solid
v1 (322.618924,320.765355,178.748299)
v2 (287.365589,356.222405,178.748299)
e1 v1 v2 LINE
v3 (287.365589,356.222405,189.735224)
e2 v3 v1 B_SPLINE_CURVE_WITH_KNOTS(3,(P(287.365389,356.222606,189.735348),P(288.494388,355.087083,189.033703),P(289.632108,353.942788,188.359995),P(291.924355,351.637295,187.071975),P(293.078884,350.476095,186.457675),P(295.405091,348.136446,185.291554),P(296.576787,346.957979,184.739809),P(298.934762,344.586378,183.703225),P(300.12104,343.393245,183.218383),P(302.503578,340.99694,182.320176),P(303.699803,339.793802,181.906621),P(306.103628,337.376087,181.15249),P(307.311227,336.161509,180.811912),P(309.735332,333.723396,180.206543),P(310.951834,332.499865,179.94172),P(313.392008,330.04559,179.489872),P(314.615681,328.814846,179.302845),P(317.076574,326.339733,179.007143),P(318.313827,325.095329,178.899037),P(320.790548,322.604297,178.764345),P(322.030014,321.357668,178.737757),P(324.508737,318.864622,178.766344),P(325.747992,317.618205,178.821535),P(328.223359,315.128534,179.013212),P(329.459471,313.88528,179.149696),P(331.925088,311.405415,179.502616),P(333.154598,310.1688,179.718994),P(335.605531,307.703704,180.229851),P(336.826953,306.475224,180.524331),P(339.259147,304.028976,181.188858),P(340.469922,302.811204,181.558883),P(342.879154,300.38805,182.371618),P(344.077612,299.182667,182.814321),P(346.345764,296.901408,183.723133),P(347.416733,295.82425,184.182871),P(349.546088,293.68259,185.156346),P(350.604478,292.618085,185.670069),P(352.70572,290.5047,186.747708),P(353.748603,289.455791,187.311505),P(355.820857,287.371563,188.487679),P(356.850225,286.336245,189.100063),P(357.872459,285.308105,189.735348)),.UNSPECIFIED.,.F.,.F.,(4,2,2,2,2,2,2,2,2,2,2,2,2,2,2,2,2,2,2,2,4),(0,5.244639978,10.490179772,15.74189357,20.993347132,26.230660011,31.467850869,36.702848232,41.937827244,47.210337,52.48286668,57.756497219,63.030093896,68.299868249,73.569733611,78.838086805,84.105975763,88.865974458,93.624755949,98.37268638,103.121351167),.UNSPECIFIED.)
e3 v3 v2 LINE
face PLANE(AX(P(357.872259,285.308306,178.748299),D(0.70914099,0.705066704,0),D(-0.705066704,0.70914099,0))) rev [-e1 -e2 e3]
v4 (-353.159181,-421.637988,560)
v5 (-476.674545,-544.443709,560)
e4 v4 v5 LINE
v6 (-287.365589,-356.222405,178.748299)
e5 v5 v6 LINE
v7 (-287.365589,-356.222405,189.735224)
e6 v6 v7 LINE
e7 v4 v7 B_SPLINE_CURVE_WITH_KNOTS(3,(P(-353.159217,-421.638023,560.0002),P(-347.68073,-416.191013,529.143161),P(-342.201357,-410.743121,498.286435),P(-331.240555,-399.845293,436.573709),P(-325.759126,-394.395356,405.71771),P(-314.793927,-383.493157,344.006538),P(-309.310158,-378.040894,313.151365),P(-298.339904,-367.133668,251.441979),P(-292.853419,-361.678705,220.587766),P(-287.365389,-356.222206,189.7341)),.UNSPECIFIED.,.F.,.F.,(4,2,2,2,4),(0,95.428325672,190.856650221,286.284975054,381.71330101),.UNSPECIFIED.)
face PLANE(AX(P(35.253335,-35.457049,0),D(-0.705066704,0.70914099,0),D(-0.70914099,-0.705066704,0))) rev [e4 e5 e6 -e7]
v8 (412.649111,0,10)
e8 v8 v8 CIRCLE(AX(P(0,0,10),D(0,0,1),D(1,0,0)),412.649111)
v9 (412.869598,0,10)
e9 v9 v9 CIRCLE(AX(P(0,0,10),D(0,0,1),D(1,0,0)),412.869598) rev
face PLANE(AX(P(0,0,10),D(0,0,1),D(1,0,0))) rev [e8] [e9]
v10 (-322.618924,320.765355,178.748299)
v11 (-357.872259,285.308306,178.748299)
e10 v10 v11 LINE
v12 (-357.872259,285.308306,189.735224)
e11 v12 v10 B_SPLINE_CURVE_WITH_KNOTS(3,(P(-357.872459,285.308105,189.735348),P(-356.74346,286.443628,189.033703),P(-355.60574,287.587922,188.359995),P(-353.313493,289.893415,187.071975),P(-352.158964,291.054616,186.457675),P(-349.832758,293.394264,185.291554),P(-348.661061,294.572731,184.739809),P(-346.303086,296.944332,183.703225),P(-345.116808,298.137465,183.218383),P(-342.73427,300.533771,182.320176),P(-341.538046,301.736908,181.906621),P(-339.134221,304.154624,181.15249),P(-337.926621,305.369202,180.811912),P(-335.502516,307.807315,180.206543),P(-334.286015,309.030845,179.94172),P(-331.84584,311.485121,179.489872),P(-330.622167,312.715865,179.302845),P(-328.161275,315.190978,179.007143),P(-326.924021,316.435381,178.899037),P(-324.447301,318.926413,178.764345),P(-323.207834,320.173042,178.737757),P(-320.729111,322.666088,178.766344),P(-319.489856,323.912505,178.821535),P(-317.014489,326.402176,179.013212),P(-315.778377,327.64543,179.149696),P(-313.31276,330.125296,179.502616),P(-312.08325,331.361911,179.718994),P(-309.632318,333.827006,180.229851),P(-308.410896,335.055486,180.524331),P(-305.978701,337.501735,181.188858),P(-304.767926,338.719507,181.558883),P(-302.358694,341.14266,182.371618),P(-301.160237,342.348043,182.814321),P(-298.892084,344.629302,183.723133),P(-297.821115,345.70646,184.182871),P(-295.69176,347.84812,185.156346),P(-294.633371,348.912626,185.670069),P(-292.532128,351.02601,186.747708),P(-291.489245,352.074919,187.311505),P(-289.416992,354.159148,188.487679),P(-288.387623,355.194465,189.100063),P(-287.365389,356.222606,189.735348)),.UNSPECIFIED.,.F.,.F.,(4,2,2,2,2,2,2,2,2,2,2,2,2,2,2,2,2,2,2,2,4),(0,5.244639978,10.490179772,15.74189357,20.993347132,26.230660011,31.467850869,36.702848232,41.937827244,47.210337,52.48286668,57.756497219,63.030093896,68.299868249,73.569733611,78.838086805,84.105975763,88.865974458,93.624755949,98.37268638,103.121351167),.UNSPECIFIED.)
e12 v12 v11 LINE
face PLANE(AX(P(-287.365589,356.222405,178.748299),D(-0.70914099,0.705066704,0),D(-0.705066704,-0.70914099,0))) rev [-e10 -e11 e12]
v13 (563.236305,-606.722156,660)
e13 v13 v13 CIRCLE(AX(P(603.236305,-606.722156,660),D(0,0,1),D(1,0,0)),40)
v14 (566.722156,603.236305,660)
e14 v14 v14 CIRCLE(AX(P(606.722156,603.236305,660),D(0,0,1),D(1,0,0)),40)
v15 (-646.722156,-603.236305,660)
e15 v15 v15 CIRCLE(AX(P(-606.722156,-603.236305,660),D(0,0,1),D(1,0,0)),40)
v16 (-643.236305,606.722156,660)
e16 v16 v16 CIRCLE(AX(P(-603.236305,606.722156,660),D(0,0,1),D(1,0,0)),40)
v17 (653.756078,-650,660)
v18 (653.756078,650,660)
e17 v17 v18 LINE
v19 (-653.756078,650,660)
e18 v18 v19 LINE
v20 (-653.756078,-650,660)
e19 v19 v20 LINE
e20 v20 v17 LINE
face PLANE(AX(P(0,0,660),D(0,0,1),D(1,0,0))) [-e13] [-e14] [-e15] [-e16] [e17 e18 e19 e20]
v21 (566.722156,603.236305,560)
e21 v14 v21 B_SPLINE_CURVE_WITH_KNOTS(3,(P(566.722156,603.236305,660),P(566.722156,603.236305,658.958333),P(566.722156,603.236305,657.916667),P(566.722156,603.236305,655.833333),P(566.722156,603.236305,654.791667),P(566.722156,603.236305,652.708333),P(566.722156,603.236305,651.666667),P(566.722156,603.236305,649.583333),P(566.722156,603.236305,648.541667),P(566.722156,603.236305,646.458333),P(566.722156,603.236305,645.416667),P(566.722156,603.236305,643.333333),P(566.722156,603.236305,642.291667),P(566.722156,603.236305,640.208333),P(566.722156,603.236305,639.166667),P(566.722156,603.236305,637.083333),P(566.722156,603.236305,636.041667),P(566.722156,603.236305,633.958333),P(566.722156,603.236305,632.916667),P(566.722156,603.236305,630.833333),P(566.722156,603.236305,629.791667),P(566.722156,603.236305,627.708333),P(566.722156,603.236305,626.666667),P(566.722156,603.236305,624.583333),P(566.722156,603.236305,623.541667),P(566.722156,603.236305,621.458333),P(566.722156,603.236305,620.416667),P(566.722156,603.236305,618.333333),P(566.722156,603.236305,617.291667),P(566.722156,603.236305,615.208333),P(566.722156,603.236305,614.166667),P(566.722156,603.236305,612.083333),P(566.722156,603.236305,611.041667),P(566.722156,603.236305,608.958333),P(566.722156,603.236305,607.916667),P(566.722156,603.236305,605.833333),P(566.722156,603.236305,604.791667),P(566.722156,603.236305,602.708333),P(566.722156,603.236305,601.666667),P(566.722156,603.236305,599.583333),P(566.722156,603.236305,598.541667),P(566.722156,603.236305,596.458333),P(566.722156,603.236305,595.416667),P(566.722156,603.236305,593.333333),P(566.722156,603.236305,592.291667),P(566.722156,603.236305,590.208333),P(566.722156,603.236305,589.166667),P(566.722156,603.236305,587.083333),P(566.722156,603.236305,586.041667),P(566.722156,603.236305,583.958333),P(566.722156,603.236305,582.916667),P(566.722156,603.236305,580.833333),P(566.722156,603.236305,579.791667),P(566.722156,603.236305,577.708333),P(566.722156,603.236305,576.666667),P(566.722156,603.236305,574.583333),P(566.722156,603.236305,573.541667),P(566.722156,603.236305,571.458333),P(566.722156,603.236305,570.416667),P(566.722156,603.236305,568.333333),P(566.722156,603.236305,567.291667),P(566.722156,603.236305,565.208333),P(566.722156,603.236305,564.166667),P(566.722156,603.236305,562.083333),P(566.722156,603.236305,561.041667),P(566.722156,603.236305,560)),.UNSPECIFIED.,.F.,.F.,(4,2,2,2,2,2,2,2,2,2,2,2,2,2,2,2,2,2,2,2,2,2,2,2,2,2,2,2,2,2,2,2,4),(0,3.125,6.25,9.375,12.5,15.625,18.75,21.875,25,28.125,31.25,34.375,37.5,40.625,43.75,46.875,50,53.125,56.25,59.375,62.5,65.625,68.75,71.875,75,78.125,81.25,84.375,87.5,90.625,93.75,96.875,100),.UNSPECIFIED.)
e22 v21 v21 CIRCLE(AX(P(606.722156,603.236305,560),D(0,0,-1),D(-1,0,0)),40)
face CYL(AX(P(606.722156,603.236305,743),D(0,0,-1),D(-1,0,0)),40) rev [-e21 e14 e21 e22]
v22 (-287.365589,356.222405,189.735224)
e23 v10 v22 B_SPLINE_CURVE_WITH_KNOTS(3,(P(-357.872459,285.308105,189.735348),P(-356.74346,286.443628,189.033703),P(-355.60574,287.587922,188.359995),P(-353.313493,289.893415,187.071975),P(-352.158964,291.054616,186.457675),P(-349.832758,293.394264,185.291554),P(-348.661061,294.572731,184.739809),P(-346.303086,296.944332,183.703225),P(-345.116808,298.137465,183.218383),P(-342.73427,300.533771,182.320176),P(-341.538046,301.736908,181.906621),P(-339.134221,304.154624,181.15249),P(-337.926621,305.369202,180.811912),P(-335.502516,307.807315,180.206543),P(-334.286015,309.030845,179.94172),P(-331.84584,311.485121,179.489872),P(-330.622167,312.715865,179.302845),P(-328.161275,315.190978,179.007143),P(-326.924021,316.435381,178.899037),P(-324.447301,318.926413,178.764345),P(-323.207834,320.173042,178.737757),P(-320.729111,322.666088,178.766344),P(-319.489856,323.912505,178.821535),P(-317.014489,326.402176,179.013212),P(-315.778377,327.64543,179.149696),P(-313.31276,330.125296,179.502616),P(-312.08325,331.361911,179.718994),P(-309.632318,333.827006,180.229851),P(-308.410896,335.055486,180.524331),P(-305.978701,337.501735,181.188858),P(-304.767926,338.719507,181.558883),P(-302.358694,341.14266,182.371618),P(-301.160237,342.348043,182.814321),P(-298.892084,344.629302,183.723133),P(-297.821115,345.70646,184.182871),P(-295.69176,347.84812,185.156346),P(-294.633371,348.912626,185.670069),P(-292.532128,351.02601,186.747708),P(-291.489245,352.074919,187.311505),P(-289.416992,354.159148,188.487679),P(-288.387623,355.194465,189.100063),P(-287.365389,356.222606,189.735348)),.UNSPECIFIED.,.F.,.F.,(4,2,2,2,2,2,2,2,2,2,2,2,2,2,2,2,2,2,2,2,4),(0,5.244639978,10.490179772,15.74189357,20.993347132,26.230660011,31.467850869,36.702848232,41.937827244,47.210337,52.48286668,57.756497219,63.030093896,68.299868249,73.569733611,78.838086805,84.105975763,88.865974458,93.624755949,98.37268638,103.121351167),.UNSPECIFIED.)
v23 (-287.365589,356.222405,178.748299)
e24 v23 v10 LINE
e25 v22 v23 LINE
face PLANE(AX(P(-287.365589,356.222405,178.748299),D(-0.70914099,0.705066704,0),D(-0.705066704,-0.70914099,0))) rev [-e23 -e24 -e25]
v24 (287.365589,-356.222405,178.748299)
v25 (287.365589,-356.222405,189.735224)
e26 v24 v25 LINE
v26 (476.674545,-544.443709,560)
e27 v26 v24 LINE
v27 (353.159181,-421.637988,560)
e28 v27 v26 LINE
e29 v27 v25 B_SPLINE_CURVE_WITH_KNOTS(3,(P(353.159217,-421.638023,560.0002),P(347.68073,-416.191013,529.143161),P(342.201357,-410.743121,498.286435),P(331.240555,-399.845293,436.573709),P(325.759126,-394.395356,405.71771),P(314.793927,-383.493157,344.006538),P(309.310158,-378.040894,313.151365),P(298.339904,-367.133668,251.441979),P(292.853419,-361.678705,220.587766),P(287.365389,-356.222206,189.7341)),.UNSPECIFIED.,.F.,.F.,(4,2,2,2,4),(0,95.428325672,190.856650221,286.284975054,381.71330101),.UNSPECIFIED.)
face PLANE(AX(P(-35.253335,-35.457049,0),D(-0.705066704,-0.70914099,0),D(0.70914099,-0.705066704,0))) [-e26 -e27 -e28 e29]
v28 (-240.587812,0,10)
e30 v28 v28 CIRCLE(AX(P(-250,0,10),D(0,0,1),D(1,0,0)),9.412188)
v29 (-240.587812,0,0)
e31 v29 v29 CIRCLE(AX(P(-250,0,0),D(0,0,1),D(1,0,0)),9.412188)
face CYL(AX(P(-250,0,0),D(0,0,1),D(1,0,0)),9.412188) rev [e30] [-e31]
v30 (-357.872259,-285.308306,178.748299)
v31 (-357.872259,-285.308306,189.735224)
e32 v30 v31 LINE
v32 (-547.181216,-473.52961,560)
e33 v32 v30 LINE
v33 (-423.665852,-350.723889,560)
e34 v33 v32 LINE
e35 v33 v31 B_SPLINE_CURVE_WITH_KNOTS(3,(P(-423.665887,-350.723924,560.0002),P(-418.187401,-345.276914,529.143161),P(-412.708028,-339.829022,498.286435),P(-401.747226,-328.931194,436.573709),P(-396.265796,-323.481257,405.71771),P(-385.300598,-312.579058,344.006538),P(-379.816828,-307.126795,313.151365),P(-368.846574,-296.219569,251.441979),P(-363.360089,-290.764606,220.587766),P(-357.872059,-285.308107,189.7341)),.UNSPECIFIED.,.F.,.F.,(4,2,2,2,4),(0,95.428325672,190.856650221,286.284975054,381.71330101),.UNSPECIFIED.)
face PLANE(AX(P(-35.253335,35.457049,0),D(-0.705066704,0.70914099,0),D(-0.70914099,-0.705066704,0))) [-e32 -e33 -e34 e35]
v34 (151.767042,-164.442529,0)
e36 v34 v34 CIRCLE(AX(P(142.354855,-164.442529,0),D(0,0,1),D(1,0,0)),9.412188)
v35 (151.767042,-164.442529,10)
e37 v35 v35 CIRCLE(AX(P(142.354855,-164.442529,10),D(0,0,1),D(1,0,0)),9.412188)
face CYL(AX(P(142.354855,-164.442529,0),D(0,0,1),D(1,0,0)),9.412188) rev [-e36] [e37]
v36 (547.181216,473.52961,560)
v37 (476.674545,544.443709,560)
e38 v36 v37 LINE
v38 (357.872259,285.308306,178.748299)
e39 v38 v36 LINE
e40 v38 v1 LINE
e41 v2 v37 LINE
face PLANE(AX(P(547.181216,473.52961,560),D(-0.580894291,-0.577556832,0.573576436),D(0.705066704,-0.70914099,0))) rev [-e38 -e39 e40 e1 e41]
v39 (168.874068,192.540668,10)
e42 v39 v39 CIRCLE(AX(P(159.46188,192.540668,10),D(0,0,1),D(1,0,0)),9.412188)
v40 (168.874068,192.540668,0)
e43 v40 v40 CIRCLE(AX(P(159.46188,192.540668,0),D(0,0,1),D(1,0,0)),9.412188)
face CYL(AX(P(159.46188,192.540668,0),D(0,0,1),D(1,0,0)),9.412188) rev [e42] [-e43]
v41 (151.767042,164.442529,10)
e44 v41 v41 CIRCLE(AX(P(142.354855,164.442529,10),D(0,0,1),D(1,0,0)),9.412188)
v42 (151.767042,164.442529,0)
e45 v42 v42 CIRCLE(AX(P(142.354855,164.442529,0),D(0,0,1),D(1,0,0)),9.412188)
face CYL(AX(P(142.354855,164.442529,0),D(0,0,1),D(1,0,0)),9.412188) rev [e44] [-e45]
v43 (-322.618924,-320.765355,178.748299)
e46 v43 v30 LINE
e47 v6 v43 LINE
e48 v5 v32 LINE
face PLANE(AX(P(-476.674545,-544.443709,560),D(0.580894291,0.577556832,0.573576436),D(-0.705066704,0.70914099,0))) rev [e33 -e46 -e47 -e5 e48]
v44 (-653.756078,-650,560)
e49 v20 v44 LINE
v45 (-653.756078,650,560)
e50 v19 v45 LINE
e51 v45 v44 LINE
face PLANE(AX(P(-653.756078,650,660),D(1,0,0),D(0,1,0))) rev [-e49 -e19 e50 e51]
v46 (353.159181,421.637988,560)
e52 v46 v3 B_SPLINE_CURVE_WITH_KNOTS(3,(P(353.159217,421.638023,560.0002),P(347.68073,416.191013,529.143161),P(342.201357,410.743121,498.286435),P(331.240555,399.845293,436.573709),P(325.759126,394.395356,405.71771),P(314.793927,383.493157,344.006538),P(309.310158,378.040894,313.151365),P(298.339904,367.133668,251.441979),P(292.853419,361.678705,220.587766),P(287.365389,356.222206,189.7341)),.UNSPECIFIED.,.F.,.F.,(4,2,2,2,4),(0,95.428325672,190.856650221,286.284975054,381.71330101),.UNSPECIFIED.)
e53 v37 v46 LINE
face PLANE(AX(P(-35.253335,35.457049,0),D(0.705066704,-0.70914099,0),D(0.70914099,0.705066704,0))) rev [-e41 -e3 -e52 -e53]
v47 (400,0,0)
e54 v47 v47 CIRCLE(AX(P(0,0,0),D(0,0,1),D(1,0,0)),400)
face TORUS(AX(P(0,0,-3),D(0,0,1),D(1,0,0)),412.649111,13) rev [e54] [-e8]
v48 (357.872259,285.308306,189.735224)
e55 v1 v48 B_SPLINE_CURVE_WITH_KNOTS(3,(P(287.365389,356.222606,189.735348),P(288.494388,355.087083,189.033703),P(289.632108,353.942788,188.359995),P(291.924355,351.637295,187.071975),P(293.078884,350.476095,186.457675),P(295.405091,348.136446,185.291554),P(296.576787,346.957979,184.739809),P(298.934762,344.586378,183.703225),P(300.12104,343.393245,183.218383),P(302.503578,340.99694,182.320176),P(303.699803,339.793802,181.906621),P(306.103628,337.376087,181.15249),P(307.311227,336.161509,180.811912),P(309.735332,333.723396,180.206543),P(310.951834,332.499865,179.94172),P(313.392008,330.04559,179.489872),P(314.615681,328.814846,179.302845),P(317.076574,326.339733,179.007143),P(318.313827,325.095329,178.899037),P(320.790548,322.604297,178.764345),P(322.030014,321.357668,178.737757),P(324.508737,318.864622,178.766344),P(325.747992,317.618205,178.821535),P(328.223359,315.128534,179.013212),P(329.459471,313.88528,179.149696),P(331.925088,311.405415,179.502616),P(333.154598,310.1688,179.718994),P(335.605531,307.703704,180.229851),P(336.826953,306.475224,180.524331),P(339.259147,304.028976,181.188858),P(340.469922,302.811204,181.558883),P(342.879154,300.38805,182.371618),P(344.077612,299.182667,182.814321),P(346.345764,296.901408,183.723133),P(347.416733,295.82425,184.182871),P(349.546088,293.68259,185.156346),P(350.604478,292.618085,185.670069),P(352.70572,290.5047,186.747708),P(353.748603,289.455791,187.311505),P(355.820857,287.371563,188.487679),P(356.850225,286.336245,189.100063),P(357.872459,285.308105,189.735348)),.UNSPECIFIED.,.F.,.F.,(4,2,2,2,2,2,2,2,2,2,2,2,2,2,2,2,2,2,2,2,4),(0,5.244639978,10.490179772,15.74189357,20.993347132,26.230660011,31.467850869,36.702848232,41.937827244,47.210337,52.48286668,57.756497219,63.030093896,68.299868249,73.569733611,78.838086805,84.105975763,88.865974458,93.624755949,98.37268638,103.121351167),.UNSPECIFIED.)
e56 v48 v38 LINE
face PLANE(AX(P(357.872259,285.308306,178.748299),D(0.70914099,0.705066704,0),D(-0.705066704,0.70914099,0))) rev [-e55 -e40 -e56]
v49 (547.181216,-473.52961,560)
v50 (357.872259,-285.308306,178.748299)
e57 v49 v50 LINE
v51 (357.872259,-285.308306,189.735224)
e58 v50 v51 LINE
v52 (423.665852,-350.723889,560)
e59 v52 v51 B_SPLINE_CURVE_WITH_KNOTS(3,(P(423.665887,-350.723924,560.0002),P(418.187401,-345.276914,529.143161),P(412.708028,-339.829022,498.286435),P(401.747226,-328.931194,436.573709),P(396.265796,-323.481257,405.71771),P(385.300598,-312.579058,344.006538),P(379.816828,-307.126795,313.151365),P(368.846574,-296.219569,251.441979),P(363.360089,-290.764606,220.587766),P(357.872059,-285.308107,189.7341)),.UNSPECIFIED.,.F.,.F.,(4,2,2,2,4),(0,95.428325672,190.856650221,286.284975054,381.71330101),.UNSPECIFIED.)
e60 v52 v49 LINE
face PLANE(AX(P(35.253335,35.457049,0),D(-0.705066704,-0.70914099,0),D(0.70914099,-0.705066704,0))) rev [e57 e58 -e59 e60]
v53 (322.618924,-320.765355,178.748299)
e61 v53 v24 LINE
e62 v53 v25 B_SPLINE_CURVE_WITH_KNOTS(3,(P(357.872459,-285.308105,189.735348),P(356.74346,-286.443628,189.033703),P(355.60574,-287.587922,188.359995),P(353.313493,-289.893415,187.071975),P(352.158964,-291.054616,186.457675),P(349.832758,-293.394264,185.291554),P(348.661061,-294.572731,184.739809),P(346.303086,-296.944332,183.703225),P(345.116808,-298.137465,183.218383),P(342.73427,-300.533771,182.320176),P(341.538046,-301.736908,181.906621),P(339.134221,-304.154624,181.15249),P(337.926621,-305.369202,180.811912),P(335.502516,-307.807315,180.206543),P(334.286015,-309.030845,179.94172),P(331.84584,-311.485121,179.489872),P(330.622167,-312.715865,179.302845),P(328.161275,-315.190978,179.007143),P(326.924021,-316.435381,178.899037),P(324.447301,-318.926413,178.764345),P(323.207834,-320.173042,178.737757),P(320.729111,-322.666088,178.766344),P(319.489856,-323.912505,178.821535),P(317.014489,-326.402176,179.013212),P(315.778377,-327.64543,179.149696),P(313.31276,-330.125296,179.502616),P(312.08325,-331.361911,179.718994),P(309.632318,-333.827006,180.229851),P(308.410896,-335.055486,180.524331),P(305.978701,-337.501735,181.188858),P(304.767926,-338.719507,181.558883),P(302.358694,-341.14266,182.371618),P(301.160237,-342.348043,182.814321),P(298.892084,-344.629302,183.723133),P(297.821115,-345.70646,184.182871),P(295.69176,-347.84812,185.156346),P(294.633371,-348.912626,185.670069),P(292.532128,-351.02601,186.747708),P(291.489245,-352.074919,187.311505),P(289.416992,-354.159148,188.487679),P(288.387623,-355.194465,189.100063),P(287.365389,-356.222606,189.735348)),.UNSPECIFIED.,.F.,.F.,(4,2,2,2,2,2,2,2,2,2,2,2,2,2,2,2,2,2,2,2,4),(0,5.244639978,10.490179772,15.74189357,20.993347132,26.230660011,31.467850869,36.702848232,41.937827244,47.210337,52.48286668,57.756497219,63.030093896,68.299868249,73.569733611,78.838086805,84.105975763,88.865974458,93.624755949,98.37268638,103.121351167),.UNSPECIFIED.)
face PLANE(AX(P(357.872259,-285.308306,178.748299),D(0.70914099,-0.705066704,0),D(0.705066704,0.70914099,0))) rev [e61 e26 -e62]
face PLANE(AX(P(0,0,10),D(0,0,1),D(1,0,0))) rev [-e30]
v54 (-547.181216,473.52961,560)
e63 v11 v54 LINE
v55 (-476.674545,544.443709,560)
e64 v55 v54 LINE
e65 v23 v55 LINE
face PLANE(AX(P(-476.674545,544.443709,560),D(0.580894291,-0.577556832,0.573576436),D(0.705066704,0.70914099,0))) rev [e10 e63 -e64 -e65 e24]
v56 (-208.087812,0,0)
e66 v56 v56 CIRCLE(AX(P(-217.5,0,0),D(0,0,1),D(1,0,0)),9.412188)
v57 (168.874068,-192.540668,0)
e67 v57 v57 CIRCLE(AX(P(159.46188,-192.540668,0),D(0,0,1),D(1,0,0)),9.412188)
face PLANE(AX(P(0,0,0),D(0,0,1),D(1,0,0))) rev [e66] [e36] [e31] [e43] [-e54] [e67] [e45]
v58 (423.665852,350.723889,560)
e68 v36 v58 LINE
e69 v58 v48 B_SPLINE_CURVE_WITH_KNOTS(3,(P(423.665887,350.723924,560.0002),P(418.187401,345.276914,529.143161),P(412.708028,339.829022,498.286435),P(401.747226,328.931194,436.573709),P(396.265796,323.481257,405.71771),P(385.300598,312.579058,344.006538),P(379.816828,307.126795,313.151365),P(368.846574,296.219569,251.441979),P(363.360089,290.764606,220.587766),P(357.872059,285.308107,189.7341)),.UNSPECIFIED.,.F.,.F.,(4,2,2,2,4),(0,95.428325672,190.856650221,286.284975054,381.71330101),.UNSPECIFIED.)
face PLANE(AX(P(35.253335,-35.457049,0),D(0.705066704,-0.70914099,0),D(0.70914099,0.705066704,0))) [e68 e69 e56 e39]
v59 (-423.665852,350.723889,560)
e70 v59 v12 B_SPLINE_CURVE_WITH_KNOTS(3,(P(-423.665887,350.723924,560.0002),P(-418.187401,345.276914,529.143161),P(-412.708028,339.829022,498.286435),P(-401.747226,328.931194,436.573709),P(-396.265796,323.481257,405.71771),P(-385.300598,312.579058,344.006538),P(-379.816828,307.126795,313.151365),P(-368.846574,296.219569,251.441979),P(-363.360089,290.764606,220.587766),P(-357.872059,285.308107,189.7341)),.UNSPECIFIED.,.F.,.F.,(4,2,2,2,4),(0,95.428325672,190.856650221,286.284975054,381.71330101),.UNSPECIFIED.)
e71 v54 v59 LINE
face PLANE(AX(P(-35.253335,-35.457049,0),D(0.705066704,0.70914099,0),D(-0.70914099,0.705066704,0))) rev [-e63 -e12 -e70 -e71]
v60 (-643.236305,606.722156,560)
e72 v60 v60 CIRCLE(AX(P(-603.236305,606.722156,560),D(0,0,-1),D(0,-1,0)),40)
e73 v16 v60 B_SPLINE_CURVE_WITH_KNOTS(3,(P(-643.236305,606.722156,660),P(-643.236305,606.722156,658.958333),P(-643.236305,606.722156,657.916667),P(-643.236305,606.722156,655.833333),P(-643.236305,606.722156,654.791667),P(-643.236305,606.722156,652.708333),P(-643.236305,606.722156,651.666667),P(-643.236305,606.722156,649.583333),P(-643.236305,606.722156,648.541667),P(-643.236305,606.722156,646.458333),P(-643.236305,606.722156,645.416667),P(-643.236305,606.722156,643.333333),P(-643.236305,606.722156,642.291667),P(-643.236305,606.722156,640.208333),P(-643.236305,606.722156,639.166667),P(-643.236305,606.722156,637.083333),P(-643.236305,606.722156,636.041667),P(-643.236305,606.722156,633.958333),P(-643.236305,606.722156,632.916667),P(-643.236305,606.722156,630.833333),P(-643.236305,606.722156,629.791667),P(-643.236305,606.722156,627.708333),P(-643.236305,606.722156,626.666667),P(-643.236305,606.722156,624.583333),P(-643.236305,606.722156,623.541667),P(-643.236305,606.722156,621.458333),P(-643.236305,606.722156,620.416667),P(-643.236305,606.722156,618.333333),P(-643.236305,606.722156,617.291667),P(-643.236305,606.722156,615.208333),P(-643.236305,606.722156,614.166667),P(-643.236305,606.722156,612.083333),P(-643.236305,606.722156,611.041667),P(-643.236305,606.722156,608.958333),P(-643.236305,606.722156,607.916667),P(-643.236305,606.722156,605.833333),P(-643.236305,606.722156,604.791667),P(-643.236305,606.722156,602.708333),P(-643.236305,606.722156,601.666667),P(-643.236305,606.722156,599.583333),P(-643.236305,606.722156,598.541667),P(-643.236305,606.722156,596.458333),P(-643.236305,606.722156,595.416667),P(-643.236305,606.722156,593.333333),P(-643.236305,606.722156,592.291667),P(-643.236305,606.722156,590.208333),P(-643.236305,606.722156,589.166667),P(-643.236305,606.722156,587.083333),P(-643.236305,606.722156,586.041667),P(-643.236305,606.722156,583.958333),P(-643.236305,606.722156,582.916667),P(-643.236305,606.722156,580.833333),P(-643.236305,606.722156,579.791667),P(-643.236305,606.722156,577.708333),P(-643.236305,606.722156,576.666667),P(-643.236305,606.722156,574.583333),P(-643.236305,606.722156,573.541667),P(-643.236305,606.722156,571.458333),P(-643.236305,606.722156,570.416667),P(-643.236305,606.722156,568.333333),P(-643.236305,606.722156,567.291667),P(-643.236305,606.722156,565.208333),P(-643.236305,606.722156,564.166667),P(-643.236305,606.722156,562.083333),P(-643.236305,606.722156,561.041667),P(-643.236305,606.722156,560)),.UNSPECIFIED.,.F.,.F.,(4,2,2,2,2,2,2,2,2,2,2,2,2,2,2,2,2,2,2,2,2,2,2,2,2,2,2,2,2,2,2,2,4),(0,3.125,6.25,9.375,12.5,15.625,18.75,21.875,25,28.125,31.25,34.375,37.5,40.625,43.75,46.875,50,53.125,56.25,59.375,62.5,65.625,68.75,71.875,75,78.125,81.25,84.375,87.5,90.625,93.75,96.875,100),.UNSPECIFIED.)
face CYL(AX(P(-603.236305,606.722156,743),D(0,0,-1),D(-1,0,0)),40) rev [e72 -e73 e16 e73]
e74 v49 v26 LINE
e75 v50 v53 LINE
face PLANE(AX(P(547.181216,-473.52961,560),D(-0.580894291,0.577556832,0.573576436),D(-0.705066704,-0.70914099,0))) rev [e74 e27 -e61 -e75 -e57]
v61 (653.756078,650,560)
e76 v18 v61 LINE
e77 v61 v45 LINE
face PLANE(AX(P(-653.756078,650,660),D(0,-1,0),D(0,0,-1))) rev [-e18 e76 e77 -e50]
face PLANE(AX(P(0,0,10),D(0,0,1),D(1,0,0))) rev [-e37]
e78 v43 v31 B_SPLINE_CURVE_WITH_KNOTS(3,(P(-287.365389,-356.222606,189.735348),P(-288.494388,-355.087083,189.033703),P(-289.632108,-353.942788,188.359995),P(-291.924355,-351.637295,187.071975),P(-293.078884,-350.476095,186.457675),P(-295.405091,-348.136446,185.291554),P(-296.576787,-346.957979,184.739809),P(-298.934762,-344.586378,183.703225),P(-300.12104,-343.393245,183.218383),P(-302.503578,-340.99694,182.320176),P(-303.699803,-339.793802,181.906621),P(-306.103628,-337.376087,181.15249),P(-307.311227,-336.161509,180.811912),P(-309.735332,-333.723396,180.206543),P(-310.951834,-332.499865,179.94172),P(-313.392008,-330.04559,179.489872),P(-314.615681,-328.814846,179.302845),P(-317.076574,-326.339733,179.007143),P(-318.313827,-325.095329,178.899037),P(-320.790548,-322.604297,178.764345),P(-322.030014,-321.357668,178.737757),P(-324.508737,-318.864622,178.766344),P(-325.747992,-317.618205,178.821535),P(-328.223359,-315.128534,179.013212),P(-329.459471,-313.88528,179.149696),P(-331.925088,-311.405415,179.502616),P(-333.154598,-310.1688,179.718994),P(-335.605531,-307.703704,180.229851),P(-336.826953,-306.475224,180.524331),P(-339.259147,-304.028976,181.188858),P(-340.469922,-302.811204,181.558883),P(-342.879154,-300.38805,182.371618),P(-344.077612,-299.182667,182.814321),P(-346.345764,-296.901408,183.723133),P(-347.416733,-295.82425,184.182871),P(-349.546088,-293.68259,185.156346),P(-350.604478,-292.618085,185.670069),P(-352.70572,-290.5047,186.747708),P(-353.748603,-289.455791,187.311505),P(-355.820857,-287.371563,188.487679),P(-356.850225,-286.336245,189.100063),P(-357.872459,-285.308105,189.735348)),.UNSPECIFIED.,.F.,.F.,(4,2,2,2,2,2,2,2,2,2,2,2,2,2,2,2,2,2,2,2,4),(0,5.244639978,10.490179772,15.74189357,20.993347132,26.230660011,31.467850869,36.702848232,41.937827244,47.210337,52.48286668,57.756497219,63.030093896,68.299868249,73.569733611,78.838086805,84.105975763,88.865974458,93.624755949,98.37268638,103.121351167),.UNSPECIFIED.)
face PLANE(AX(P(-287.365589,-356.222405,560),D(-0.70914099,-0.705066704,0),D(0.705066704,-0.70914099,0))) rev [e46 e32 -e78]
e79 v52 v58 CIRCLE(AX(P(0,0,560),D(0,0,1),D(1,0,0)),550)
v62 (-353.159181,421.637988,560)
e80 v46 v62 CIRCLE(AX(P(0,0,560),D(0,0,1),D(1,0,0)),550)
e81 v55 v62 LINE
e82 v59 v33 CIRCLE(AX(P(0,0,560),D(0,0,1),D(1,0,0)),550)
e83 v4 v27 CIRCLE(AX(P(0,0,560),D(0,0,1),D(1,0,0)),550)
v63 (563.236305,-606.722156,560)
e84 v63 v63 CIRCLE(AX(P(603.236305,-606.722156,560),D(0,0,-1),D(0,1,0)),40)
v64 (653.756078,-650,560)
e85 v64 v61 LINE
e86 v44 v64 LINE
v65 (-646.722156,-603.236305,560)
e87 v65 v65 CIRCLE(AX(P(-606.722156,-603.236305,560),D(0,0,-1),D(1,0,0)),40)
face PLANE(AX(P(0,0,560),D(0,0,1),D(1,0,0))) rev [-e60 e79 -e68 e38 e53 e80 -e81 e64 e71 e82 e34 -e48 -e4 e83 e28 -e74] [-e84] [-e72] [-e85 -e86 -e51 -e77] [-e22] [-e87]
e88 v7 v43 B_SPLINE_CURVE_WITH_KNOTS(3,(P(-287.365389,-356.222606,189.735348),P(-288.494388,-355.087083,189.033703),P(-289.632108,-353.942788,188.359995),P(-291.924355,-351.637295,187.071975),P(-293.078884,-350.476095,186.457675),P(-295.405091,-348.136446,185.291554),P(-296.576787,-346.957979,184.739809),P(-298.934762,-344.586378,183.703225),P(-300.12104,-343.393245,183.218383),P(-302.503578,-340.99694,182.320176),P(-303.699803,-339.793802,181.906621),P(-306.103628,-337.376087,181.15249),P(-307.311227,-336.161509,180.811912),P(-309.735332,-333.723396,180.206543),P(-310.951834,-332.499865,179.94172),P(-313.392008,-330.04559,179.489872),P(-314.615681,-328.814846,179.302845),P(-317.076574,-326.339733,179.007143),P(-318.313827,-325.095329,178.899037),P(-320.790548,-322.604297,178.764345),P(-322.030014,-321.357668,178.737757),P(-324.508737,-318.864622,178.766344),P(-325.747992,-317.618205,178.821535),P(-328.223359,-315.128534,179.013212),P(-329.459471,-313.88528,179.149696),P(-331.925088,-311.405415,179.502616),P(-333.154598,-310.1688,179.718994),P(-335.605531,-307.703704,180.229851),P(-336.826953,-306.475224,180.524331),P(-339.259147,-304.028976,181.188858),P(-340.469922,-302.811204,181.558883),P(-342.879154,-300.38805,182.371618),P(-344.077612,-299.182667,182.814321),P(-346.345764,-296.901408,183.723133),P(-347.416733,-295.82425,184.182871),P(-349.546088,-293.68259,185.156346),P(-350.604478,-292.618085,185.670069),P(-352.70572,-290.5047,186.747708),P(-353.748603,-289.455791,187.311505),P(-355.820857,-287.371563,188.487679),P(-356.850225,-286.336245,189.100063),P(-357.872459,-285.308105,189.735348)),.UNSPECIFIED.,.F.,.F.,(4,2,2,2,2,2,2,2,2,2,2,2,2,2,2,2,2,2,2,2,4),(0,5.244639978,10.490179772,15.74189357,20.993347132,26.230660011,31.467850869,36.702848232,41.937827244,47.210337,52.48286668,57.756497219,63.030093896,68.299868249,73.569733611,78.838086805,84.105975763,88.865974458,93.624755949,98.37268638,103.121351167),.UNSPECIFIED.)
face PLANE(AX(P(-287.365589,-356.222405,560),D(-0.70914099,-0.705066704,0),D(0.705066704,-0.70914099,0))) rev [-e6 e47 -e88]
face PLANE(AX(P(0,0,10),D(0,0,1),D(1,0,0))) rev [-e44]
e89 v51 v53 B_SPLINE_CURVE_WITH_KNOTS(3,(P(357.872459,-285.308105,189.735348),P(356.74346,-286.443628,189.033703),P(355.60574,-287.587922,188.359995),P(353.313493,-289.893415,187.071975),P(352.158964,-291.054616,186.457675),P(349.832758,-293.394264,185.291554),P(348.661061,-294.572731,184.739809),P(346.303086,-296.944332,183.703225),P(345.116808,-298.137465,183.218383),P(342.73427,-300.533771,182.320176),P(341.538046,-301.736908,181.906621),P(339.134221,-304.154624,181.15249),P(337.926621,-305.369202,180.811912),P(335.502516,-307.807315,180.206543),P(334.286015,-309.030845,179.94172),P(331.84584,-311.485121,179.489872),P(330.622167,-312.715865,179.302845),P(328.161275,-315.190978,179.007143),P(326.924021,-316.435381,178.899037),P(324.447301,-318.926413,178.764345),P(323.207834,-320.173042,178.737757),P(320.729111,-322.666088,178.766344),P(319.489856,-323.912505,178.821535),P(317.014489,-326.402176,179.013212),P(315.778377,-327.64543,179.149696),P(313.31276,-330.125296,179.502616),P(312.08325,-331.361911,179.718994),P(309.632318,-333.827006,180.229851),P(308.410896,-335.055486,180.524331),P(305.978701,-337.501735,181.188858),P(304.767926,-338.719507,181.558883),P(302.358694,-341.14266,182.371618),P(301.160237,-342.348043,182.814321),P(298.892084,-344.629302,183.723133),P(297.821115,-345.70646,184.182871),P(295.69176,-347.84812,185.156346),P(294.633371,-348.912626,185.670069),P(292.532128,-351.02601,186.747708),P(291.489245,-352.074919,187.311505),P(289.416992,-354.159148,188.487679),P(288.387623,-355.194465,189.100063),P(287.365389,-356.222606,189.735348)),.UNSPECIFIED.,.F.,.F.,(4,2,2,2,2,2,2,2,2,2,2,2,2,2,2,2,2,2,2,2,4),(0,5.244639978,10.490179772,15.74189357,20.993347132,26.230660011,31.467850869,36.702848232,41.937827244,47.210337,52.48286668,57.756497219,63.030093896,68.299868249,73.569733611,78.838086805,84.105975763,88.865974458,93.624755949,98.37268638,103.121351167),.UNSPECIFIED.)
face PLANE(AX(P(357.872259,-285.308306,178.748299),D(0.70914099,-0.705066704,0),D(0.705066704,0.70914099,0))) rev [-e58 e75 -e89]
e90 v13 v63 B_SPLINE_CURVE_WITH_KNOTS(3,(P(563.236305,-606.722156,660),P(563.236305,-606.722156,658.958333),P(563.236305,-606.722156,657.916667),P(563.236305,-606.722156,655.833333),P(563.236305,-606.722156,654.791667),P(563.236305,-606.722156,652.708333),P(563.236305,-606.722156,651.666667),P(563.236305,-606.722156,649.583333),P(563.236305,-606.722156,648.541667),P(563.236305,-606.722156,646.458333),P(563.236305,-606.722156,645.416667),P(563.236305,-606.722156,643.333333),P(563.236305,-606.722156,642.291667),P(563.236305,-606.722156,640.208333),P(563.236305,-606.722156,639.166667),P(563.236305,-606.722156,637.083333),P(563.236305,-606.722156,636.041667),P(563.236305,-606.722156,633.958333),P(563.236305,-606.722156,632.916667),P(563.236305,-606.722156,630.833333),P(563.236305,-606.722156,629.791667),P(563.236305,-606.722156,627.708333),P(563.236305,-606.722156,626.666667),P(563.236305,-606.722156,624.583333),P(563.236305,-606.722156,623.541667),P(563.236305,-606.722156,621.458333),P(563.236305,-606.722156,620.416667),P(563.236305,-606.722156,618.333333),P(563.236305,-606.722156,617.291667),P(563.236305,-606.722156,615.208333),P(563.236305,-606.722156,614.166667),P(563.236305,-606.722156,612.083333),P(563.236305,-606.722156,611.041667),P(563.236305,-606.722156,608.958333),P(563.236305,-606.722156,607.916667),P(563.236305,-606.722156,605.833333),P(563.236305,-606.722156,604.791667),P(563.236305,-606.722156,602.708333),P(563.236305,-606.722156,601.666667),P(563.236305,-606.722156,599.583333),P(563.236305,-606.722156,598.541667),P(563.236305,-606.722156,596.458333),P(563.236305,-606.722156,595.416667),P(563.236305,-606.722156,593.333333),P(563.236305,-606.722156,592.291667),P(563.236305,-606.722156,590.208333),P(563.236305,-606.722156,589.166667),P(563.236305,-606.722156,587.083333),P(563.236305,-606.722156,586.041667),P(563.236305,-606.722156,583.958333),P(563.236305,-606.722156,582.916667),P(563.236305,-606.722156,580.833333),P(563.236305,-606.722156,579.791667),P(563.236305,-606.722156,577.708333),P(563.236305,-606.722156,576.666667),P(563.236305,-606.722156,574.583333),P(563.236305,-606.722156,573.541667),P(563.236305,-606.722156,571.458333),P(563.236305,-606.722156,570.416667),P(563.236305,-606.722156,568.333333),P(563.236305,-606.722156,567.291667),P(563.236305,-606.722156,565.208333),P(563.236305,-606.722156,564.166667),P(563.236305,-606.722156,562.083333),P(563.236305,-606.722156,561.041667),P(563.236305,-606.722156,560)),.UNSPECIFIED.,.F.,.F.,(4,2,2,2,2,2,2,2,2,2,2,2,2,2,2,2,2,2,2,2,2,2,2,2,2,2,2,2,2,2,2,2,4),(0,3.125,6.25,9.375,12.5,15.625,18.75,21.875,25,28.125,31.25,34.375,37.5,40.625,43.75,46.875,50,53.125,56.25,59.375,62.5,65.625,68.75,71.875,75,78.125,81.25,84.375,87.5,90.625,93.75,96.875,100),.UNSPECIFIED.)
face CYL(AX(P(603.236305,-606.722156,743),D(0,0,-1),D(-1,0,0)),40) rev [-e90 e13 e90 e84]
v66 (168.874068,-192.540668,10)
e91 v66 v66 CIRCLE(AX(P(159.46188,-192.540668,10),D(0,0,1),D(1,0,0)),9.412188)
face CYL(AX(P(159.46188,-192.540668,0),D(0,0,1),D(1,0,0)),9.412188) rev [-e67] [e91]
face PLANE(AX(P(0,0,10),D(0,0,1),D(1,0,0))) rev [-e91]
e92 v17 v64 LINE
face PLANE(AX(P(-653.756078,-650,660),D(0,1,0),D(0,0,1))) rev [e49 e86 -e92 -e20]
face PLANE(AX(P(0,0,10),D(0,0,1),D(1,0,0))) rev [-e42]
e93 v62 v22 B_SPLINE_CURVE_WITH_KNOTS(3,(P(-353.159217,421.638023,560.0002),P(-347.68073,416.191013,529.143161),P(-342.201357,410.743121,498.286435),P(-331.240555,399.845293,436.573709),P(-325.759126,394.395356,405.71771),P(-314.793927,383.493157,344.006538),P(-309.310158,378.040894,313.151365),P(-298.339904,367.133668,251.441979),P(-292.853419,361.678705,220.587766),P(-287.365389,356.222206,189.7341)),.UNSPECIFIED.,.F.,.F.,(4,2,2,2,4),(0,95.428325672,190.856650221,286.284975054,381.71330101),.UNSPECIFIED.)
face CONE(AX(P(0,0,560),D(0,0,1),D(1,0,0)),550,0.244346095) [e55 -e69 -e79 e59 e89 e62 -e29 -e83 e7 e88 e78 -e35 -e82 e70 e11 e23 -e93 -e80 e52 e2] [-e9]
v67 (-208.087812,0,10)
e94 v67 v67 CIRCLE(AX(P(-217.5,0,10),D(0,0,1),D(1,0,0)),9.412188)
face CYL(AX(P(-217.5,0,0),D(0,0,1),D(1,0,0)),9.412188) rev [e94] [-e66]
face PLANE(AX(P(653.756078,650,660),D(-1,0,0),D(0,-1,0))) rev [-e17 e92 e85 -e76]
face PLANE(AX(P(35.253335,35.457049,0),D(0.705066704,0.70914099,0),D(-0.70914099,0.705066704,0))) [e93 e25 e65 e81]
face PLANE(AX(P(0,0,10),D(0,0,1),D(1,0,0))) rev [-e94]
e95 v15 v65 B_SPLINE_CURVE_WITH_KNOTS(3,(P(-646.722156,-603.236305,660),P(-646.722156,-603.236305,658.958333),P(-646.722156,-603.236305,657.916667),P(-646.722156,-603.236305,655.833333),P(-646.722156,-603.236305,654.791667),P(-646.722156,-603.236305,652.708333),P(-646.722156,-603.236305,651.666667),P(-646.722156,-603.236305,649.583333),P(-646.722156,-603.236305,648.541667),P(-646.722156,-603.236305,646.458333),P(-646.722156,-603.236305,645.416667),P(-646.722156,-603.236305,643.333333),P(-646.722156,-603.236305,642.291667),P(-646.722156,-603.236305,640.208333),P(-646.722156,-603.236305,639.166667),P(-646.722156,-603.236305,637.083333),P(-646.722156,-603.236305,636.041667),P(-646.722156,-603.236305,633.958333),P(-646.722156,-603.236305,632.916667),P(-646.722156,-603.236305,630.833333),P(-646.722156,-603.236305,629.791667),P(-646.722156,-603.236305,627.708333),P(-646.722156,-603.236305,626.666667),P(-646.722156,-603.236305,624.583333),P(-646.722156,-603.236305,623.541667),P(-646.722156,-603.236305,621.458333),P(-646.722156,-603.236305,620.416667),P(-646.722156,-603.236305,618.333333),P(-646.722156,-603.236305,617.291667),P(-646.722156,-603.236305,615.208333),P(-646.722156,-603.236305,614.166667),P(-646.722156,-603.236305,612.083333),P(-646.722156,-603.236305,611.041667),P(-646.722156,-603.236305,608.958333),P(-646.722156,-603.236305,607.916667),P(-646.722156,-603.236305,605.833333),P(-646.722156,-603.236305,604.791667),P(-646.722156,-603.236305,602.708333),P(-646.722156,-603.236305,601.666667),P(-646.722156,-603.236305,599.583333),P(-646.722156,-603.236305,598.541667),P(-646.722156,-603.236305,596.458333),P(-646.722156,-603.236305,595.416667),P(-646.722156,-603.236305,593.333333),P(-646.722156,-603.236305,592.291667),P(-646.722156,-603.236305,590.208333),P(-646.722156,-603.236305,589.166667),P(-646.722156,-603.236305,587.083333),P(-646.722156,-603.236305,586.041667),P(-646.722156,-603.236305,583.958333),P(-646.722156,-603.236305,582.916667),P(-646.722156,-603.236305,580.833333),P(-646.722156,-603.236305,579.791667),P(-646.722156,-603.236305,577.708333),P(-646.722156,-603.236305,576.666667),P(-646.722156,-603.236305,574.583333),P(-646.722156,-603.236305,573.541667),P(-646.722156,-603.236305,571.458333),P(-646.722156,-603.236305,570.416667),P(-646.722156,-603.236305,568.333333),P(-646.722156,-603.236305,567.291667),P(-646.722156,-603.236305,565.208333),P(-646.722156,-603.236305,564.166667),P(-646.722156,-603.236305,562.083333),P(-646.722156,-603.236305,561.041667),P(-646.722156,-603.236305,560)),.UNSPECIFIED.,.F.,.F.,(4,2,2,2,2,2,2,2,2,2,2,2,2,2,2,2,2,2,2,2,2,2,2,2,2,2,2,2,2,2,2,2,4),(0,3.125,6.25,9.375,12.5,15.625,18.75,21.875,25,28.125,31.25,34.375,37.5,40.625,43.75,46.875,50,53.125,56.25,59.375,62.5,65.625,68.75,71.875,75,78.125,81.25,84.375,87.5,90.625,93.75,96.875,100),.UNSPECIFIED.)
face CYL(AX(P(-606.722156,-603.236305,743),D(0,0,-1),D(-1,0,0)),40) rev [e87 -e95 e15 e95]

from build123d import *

# Parameters (mm, degrees)
SCHIZZO1_R                      = 400
ESTRUSIONE_ESTRUSIONE2_DEPTH    = 10
SCHIZZO2_R                      = 550
ESTRUSIONE_ESTRUSIONE3_DEPTH    = 550
ESTRUSIONE_ESTRUSIONE3_DRAFT    = -14
SCHIZZO7_W                      = 1307.512156596
SCHIZZO7_H                      = 1300
SCHIZZO7_R                      = 550
ESTRUSIONE_ESTRUSIONE4_DEPTH    = 100
ESTRUSIONE_ESTRUSIONE15_DEPTH   = 50
SCHIZZO16_R                     = 40
TAGLIO_ESTRUSIONE1_DEPTH        = 183
ESTRUSIONE_ESTRUSIONE21_DEPTH   = 50
ESTRUSIONE_ESTRUSIONE23_DEPTH   = 50
ESTRUSIONE_ESTRUSIONE23_2_DEPTH = 50
RIPETIZIONECIRCOLARE3_COUNT     = 4
SCHIZZO19_R                     = 550
ESTRUSIONE_ESTRUSIONE24_DEPTH   = 100
RACCORDO1_R                     = 13


with BuildPart() as part:
    # Schizzo1 → Estrusione-Estrusione2 (new body)
    with BuildSketch(Plane.XY.offset(10)):
        Circle(SCHIZZO1_R)
        with BuildLine():
            ThreePointArc((159.461880199, 183.128480143), (168.874067872, 192.540667817), (159.461880199, 201.952855491))
            ThreePointArc((159.461880199, 201.952855491), (150.049692525, 192.540667817), (159.461880199, 183.128480143))
        make_face(mode=Mode.SUBTRACT)
        with BuildLine():
            ThreePointArc((142.354854673, 173.854716695), (132.942666999, 164.442529021), (142.354854673, 155.030341347))
            ThreePointArc((142.354854673, 155.030341347), (151.767042347, 164.442529021), (142.354854673, 173.854716695))
        make_face(mode=Mode.SUBTRACT)
        with BuildLine():
            ThreePointArc((142.354854673, -155.030341347), (132.942666999, -164.442529021), (142.354854673, -173.854716695))
            ThreePointArc((142.354854673, -173.854716695), (151.767042347, -164.442529021), (142.354854673, -155.030341347))
        make_face(mode=Mode.SUBTRACT)
        with BuildLine():
            ThreePointArc((159.461880199, -183.128480143), (150.049692525, -192.540667817), (159.461880199, -201.952855491))
            ThreePointArc((159.461880199, -201.952855491), (168.874067872, -192.540667817), (159.461880199, -183.128480143))
        make_face(mode=Mode.SUBTRACT)
        with BuildLine():
            ThreePointArc((-217.5, 9.412187674), (-226.912187674, 0), (-217.5, -9.412187674))
            ThreePointArc((-217.5, -9.412187674), (-208.087812326, 0), (-217.5, 9.412187674))
        make_face(mode=Mode.SUBTRACT)
        with BuildLine():
            ThreePointArc((-250, 9.412187674), (-259.412187674, 0), (-250, -9.412187674))
            ThreePointArc((-250, -9.412187674), (-240.587812326, 0), (-250, 9.412187674))
        make_face(mode=Mode.SUBTRACT)
    extrude(amount=-ESTRUSIONE_ESTRUSIONE2_DEPTH)


with BuildPart() as estrusione_estrusione3_tool:
    # Schizzo2 → Estrusione-Estrusione3 (with draft: the straight prism first)
    with BuildSketch(Plane.XY.offset(560)):
        Circle(SCHIZZO2_R)
    extrude(amount=-ESTRUSIONE_ESTRUSIONE3_DEPTH)
    # Estrusione-Estrusione3: the draft: its side faces are tilted about the plane it starts from
    estrusione_estrusione3_sides = [estrusione_estrusione3_tool.faces().sort_by_distance(p)[0] for p in [
        (-550, 0, 285),
    ]]
    draft(estrusione_estrusione3_sides, Plane.XY.offset(560), ESTRUSIONE_ESTRUSIONE3_DRAFT)


with BuildPart() as part_1:
    add(part.part)

    # Estrusione-Estrusione3: add estrusione_estrusione3_tool
    add(estrusione_estrusione3_tool.part)



with BuildPart() as body_2:
    # Schizzo7 → Estrusione-Estrusione4 (new body)
    with BuildSketch(Plane.XY.offset(560)):
        Rectangle(SCHIZZO7_W, SCHIZZO7_H)
        Circle(SCHIZZO7_R, mode=Mode.SUBTRACT)
    extrude(amount=ESTRUSIONE_ESTRUSIONE4_DEPTH)

    # Schizzo16 → Taglio-Estrusione1 (cut)
    with BuildSketch(Plane(origin=(0, 0, 560), x_dir=(-1, 0, 0), z_dir=(0, 0, -1))):
        with Locations((-606.722155674, 603.236305221)):
            Circle(SCHIZZO16_R)
    taglio_estrusione1 = extrude(amount=-TAGLIO_ESTRUSIONE1_DEPTH, mode=Mode.SUBTRACT)

    # RipetizioneCircolare3: Taglio-Estrusione1 ×4 about axis
    ripetizionecircolare3_axis = Axis((0, 0, 0), (0, 0, 1))
    for i in range(1, RIPETIZIONECIRCOLARE3_COUNT):
        add(taglio_estrusione1.rotate(ripetizionecircolare3_axis, i * 360 / RIPETIZIONECIRCOLARE3_COUNT), mode=Mode.SUBTRACT)


with BuildPart() as body_3:
    # Schizzo15 → Estrusione-Estrusione15 (new, symmetric)
    with BuildSketch(Plane(origin=(0, 0, 0), x_dir=(-0.7091409896026719, -0.7050667038410928, 0), z_dir=(0.7050667038410928, -0.7091409896026719, 0))):
        Polygon((-721.89858982, -560), (-454.943274801, -178.748298966), (-454.943274801, -560), align=None)
    extrude(amount=ESTRUSIONE_ESTRUSIONE15_DEPTH, both=True)


with BuildPart() as body_4:
    # Schizzo17 → Estrusione-Estrusione21 (new, symmetric)
    with BuildSketch(Plane(origin=(0, 0, 0), x_dir=(-0.7091409896026719, -0.7050667038410928, 0), z_dir=(0.7050667038410928, -0.7091409896026719, 0))):
        Polygon((721.89858982, -560), (454.943274801, -178.748298966), (454.943274801, -560), align=None)
    extrude(amount=ESTRUSIONE_ESTRUSIONE21_DEPTH, both=True)


with BuildPart() as body_5:
    # Schizzo18 → Estrusione-Estrusione23 (new, symmetric)
    with BuildSketch(Plane(origin=(0, 0, 0), x_dir=(0.7091409896026718, -0.7050667038410929, 0), z_dir=(0.7050667038410929, 0.7091409896026718, 0))):
        Polygon((-721.89858982, -560), (-454.943274801, -178.748298966), (-454.943274801, -560), align=None)
    extrude(amount=ESTRUSIONE_ESTRUSIONE23_DEPTH, both=True)


with BuildPart() as body_6:
    # Schizzo18 → Estrusione-Estrusione23 2 (new, symmetric)
    with BuildSketch(Plane(origin=(0, 0, 0), x_dir=(0.7091409896026718, -0.7050667038410929, 0), z_dir=(0.7050667038410929, 0.7091409896026718, 0))):
        Polygon((721.89858982, -560), (454.943274801, -178.748298966), (454.943274801, -560), align=None)
    extrude(amount=ESTRUSIONE_ESTRUSIONE23_2_DEPTH, both=True)


with BuildPart() as part_2:
    add(part_1.part)

    add(body_2.part)  # Estrusione-Estrusione24 merges body 2

    add(body_3.part)  # Estrusione-Estrusione24 merges body 3

    add(body_4.part)  # Estrusione-Estrusione24 merges body 4

    add(body_5.part)  # Estrusione-Estrusione24 merges body 5

    add(body_6.part)  # Estrusione-Estrusione24 merges body 6
    # Schizzo19 → Estrusione-Estrusione24 (add)
    with BuildSketch(Plane.XY.offset(560)):
        Circle(SCHIZZO19_R)
    extrude(amount=ESTRUSIONE_ESTRUSIONE24_DEPTH)

    # Raccordo1
    # the kernel refuses this fillet: 13 mm, written as the material it adds along each edge
    with BuildSketch(Plane(origin=(0, 0, 10), x_dir=(1, 0, 0), z_dir=(0, -1, 0))) as raccordo1_piece_1:
        with BuildLine():
            CenterArc((412.649110641, -13), RACCORDO1_R, 90, 76.657636203)
            Line((400, -10), (400, 0))
            Line((400, 0), (412.649110641, 0))
        make_face()
    revolve(axis=Axis((0, 0, 10), (0, 0, 1)))


solid = part_2.part
